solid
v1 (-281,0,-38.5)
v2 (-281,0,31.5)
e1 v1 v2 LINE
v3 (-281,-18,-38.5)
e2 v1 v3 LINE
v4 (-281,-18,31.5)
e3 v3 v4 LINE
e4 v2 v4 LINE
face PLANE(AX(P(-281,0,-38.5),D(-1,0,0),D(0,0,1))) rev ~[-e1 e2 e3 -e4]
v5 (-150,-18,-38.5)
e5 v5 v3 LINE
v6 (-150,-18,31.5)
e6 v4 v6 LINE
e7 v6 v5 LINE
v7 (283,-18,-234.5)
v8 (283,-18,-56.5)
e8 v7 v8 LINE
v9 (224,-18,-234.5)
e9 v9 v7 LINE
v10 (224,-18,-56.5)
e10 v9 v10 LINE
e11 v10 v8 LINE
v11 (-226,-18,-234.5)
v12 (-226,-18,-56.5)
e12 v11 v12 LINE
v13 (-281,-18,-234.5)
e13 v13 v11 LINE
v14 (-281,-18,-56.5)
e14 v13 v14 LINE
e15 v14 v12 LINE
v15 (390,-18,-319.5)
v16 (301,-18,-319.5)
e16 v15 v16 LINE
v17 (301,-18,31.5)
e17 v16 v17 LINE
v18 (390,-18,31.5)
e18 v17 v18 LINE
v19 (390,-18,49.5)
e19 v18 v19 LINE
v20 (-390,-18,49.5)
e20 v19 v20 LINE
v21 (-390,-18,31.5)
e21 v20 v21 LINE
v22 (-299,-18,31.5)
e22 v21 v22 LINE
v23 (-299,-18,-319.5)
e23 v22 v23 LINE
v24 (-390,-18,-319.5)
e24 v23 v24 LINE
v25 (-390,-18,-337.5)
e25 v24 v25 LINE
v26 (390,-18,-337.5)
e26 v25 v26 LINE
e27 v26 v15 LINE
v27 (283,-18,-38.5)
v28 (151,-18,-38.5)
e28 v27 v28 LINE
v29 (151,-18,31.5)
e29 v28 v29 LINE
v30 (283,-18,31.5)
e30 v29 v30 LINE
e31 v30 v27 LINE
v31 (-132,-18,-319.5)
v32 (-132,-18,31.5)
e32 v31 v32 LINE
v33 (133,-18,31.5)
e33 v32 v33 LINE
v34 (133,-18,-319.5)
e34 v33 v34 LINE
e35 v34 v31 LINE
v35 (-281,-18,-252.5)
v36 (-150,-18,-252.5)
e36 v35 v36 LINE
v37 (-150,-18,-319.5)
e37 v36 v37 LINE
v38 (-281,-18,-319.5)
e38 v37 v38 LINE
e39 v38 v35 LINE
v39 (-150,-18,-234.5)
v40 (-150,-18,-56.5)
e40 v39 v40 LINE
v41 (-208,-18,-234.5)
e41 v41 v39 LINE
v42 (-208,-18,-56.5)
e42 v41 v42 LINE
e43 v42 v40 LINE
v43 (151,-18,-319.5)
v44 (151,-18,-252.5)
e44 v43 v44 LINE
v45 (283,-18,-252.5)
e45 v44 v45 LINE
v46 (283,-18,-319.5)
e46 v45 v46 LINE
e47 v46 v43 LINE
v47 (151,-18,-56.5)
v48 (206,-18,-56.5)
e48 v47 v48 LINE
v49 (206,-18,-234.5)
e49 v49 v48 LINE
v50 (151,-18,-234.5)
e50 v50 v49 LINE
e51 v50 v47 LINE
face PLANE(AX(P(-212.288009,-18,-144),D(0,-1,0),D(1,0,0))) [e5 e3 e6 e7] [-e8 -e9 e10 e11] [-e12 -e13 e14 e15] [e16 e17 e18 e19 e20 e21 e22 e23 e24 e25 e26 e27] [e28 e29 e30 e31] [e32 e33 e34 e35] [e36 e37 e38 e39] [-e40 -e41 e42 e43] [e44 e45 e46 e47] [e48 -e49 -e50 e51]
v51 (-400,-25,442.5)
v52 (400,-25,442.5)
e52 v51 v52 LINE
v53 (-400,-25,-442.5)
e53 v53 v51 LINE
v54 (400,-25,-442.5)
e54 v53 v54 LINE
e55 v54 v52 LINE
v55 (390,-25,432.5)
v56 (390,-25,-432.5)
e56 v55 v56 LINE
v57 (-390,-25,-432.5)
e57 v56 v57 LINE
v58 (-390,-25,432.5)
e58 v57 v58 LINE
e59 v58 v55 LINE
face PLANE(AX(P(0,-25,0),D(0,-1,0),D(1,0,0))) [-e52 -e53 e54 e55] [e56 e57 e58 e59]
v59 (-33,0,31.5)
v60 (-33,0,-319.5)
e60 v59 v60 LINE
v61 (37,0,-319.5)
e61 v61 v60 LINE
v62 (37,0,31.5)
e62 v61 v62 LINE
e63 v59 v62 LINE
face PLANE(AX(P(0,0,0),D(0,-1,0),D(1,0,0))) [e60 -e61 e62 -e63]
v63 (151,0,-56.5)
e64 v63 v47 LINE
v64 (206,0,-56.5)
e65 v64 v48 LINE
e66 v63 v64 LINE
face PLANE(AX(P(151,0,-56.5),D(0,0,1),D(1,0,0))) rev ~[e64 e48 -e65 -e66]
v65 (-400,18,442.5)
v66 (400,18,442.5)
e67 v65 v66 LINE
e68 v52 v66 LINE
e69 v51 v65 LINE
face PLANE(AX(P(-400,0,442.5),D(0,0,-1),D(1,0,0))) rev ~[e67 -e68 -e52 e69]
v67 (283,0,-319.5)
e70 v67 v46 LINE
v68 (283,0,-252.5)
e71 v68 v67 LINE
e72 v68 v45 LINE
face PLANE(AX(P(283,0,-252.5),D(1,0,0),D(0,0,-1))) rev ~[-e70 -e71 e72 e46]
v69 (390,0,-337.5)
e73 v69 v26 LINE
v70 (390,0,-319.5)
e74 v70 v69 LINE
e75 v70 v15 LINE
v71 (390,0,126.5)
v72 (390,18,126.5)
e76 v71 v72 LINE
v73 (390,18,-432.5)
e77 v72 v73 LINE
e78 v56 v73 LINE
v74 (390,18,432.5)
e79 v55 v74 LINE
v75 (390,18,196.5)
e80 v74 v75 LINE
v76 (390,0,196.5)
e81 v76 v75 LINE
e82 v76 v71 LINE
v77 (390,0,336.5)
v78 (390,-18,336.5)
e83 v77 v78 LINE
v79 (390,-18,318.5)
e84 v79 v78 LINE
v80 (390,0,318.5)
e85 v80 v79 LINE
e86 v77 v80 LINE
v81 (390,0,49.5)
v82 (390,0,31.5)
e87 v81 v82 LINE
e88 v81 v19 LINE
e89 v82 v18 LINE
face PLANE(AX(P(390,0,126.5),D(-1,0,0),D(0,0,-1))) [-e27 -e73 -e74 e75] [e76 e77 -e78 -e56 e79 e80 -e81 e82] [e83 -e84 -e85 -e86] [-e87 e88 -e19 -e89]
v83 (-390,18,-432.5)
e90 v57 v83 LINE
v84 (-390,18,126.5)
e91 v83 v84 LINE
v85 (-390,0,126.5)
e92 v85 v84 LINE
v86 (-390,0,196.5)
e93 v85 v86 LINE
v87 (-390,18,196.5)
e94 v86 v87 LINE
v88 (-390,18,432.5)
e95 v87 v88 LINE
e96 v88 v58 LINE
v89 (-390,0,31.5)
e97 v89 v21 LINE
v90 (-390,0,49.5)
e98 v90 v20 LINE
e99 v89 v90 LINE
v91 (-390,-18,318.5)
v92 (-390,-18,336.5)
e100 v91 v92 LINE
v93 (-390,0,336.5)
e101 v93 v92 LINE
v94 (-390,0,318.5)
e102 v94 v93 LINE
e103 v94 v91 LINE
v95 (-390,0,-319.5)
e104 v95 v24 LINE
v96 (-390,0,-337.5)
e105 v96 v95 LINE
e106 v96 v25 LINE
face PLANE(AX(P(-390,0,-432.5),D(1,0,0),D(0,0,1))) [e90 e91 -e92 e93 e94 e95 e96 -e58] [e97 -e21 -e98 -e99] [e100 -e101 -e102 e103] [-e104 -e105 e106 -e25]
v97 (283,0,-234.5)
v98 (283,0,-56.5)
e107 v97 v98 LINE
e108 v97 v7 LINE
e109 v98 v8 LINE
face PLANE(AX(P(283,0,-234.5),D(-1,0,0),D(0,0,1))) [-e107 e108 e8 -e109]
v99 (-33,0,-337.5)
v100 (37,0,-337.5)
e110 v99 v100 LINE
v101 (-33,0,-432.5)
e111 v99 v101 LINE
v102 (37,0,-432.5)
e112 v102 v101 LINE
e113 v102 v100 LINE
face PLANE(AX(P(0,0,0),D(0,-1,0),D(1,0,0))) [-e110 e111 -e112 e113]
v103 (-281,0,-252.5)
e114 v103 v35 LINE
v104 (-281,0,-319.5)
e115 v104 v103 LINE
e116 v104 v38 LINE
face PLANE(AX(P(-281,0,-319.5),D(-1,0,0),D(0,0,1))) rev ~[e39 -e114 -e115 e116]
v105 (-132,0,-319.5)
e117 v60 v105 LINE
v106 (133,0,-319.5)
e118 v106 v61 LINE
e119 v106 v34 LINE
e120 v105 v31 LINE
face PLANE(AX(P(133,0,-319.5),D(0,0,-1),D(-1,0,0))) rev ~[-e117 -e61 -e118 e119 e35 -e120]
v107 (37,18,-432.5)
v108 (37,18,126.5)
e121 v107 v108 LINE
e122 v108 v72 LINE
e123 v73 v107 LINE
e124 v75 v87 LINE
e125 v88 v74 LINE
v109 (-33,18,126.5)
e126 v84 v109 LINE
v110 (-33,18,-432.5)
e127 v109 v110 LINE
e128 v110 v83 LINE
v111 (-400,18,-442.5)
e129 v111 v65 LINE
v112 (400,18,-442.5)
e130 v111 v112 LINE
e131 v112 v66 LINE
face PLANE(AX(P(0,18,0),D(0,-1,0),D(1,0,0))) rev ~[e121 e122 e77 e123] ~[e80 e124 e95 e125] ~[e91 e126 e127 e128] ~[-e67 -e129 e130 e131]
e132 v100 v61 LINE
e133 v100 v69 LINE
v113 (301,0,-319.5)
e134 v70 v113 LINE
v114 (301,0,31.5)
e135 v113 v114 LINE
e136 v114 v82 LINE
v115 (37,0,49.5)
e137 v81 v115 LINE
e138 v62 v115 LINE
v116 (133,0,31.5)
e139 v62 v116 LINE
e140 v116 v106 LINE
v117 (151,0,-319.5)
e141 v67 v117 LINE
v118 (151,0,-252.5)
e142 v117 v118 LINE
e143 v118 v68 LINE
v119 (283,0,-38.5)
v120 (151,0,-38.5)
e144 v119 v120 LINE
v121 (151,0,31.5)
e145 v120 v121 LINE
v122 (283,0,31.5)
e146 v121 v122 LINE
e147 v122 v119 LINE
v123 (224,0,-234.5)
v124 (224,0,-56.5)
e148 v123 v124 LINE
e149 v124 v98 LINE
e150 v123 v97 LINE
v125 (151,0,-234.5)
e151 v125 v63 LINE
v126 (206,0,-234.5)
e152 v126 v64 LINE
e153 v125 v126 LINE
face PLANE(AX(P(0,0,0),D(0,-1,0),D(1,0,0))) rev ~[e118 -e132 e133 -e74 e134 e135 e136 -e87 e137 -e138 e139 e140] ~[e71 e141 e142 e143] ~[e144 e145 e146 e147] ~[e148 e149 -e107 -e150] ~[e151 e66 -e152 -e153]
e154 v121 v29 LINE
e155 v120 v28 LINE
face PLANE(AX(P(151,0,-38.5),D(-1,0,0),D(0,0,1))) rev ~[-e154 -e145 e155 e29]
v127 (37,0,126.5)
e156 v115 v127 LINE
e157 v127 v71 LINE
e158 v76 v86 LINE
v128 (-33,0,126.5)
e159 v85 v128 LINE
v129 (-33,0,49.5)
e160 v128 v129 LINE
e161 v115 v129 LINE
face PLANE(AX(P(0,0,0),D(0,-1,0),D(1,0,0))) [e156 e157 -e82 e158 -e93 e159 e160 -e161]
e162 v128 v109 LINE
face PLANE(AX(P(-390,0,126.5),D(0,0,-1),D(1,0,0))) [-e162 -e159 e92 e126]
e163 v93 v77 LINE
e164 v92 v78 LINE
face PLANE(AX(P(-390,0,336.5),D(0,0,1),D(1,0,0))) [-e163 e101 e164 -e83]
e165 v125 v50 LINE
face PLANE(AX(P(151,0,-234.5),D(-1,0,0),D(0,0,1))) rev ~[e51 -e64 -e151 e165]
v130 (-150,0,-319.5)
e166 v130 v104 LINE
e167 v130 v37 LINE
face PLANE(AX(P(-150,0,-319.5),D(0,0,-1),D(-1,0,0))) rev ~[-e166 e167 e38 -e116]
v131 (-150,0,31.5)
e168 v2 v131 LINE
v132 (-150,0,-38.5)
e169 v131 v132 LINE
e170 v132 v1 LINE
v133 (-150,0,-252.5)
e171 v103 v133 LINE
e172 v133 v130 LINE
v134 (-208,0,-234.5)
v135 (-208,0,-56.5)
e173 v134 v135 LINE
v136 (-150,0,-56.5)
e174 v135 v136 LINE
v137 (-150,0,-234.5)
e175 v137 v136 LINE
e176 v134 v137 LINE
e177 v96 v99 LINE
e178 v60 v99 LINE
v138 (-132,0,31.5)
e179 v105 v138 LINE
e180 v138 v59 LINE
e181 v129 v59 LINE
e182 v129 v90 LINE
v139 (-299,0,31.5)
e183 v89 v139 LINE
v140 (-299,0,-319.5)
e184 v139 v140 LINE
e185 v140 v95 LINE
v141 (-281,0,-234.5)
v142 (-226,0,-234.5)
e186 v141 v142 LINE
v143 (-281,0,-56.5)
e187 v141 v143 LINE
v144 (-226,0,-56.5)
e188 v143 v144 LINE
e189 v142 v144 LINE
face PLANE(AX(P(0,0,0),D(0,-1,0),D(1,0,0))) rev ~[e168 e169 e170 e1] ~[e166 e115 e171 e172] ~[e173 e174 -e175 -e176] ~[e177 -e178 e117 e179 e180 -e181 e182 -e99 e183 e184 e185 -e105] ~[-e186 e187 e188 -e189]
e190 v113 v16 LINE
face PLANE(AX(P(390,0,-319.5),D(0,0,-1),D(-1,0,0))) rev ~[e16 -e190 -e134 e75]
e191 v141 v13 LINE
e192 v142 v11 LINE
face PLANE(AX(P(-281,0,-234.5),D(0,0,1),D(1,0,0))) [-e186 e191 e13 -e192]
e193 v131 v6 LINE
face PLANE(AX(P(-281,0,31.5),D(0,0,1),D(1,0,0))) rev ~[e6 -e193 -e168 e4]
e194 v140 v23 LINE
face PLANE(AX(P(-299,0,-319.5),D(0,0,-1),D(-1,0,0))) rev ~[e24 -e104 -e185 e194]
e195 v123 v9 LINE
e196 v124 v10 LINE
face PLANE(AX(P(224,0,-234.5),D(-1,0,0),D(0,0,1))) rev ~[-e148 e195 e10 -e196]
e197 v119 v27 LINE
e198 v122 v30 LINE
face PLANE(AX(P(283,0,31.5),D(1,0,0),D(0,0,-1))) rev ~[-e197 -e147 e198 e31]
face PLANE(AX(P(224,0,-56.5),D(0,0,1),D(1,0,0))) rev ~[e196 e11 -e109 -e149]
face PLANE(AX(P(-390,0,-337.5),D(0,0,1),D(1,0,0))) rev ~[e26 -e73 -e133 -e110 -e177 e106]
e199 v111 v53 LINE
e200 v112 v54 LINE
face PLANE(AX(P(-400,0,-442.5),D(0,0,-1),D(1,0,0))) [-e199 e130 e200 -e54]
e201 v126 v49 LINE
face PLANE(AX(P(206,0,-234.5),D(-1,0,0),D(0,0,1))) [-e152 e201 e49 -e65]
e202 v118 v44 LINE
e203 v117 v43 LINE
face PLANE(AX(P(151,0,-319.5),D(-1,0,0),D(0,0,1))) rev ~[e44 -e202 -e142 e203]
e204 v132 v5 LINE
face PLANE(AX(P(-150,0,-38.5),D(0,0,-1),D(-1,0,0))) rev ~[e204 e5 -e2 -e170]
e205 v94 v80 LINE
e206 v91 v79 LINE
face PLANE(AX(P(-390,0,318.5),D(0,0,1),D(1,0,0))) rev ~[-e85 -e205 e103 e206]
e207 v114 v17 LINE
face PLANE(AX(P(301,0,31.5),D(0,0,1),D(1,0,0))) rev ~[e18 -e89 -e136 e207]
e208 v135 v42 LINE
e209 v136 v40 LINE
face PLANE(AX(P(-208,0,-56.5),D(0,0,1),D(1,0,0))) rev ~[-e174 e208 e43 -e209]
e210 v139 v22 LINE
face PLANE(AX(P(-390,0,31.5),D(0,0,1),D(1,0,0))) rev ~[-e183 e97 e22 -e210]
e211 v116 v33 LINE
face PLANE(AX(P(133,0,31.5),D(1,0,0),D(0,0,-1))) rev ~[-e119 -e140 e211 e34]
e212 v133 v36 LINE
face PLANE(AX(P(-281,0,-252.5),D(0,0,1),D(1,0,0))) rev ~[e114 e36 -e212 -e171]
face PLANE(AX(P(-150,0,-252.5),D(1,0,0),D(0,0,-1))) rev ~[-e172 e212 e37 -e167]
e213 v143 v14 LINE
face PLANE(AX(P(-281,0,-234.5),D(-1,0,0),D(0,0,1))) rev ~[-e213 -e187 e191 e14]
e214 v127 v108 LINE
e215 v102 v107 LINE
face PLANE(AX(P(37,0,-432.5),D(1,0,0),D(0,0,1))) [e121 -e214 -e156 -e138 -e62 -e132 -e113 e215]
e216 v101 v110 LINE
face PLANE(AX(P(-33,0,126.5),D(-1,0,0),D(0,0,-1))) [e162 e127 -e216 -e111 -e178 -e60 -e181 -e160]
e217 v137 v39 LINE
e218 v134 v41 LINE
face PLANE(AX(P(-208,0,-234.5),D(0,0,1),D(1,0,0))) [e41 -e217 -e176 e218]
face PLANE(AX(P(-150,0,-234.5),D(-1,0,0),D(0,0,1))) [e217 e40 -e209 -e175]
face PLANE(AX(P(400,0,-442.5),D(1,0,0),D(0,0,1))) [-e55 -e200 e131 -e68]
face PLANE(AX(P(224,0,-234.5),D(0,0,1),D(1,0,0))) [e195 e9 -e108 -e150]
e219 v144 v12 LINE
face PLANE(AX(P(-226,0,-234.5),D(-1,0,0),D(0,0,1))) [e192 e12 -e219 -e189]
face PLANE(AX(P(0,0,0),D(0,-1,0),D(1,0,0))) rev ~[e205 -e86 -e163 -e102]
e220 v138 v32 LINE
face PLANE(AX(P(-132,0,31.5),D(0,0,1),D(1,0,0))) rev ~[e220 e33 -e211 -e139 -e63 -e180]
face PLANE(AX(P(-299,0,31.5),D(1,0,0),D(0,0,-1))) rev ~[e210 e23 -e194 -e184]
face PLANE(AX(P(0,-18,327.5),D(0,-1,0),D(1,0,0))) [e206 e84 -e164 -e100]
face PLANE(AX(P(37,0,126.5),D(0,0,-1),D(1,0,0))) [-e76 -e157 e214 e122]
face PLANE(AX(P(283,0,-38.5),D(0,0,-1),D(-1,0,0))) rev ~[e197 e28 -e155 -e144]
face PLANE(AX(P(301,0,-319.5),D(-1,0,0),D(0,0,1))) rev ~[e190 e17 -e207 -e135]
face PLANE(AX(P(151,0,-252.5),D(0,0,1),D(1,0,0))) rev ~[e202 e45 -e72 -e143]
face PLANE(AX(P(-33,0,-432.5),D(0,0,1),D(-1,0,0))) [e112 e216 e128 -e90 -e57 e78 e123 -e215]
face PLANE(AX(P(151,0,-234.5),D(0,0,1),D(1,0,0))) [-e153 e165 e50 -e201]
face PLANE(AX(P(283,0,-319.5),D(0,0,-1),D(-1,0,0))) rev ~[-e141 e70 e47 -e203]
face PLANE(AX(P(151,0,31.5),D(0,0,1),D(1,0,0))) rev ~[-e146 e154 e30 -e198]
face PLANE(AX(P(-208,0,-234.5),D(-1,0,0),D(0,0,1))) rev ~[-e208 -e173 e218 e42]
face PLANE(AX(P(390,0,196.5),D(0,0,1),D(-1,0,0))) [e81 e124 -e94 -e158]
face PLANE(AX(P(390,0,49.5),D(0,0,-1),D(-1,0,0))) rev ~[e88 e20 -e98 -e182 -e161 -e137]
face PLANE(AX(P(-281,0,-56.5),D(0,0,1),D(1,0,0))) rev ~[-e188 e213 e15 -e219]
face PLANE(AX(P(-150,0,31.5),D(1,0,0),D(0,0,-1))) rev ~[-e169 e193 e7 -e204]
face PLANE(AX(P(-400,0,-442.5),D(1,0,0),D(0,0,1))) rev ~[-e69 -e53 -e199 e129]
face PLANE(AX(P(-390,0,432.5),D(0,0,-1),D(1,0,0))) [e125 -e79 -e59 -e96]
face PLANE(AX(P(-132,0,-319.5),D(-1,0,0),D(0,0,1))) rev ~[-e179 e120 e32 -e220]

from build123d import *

# Parameters (mm, degrees)
F0_W     = 55
F0_H     = 178
F0_W_2   = 58
F0_W_3   = 59
F0_W_4   = 70
F0_H_2   = 18
F1_DEPTH = 18
F0_W_5   = 780
F0_W_6   = 800
F0_H_3   = 885
F2_DEPTH = 25
F0_W_7   = 357
F0_H_4   = 70
F0_W_8   = 353
F0_H_5   = 351
F0_H_6   = 95
F0_H_7   = 77
F3_DEPTH = 18


# Not quite as in the source:
# - a feature names something its author has since deleted; it is built from what else it names


with BuildPart() as f1:
    # F0 (on Front) → F1 (new body)
    with BuildSketch(Plane.XZ):
        Polygon((-299, 49.5), (-390, 49.5), (-390, 40.5200137198), (-390, 31.5), (-299, 31.5), (-299, -38.5), (-299, -56.5), (-299, -234.5), (-299, -252.5), (-299, -319.5), (-390, -319.5), (-390, -337.5), (-299, -337.5), (-281, -337.5), (-150, -337.5), (-132, -337.5), (-33, -337.5), (-33, -319.5), (-132, -319.5), (-132, -252.5), (-132, -234.5), (-132, -56.5), (-132, -38.5), (-132, 31.5), (-33, 31.5), (-33, 49.5), (-132, 49.5), (-150, 49.5), (-281, 49.5), align=None)
        Polygon((-226, -252.5), (-208, -252.5), (-150, -252.5), (-150, -319.5), (-281, -319.5), (-281, -252.5), align=None, mode=Mode.SUBTRACT)
        with Locations((-253.5, -145.5)):
            Rectangle(F0_W, F0_H, mode=Mode.SUBTRACT)
        Polygon((-281, 31.5), (-150, 31.5), (-150, -38.5), (-208, -38.5), (-226, -38.5), (-281, -38.5), align=None, mode=Mode.SUBTRACT)
        with Locations((-179, -145.5)):
            Rectangle(F0_W_2, F0_H, mode=Mode.SUBTRACT)
        Polygon((390, 40.5200137198), (390, 49.5), (301, 49.5), (283, 49.5), (151, 49.5), (133, 49.5), (37, 49.5), (37, 31.5), (133, 31.5), (133, -38.5), (133, -56.5), (133, -234.5), (133, -252.5), (133, -319.5), (37, -319.5), (37, -337.5), (133, -337.5), (151, -337.5), (283, -337.5), (301, -337.5), (390, -337.5), (390, -319.5), (301, -319.5), (301, -252.5), (301, -234.5), (301, -56.5), (301, -38.5), (301, 31.5), (390, 31.5), align=None)
        Polygon((206, -252.5), (224, -252.5), (283, -252.5), (283, -319.5), (151, -319.5), (151, -252.5), align=None, mode=Mode.SUBTRACT)
        with Locations((178.5, -145.5)):
            Rectangle(F0_W, F0_H, mode=Mode.SUBTRACT)
        with Locations((253.5, -145.5)):
            Rectangle(F0_W_3, F0_H, mode=Mode.SUBTRACT)
        Polygon((151, 31.5), (283, 31.5), (283, -38.5), (224, -38.5), (206, -38.5), (151, -38.5), align=None, mode=Mode.SUBTRACT)
        with Locations((2, 40.5)):
            Rectangle(F0_W_4, F0_H_2)
        with Locations((2, -328.5)):
            Rectangle(F0_W_4, F0_H_2)
    extrude(amount=F1_DEPTH)



with BuildPart() as f1b:
    # F0 (on Front) → F1, piece 2 (new body)
    with BuildSketch(Plane.XZ):
        with Locations((0, 327.5)):
            Rectangle(F0_W_5, F0_H_2)
    extrude(amount=F1_DEPTH)


with BuildPart() as f1_1:
    add(f1.part)

    add(f1b.part)  # F2 merges F1b
    # F0 (on Front) → F2 (join)
    with BuildSketch(Plane.XZ):
        Rectangle(F0_W_6, F0_H_3)
        Polygon((-390, 432.5), (390, 432.5), (390, 336.5), (390, 318.5), (390, 196.5), (390, 126.5), (390, 49.5), (390, 40.5200137198), (390, 31.5), (390, -38.5), (390, -56.5), (390, -234.5), (390, -252.5), (390, -319.5), (390, -337.5), (390, -432.5), (37, -432.5), (-33, -432.5), (-390, -432.5), (-390, -337.5), (-390, -319.5), (-390, -252.5), (-390, -234.5), (-390, -140.5), (-390, -56.5), (-390, -38.5), (-390, 31.5), (-390, 40.5200137198), (-390, 49.5), (-390, 126.5), (-390, 196.5), (-390, 318.5), (-390, 336.5), align=None, mode=Mode.SUBTRACT)
    extrude(amount=F2_DEPTH)

    # F0 (on Front) → F3 (join)
    with BuildSketch(Plane.XZ):
        Rectangle(F0_W_6, F0_H_3)
        Polygon((-390, 432.5), (390, 432.5), (390, 336.5), (390, 318.5), (390, 196.5), (390, 126.5), (390, 49.5), (390, 40.5200137198), (390, 31.5), (390, -38.5), (390, -56.5), (390, -234.5), (390, -252.5), (390, -319.5), (390, -337.5), (390, -432.5), (37, -432.5), (-33, -432.5), (-390, -432.5), (-390, -337.5), (-390, -319.5), (-390, -252.5), (-390, -234.5), (-390, -140.5), (-390, -56.5), (-390, -38.5), (-390, 31.5), (-390, 40.5200137198), (-390, 49.5), (-390, 126.5), (-390, 196.5), (-390, 318.5), (-390, 336.5), align=None, mode=Mode.SUBTRACT)
        with Locations((-211.5, 161.5)):
            Rectangle(F0_W_7, F0_H_4)
        with Locations((213.5, 161.5)):
            Rectangle(F0_W_8, F0_H_4)
        with Locations((2, -144)):
            Rectangle(F0_W_4, F0_H_5)
        with Locations((2, -385)):
            Rectangle(F0_W_4, F0_H_6)
        with Locations((2, 88)):
            Rectangle(F0_W_4, F0_H_7)
        with Locations((2, 161.5)):
            Rectangle(F0_W_4, F0_H_4)
        with Locations((2, 40.5)):
            Rectangle(F0_W_4, F0_H_2)
        with Locations((2, -328.5)):
            Rectangle(F0_W_4, F0_H_2)
    extrude(amount=-F3_DEPTH)


solid = f1_1.part
